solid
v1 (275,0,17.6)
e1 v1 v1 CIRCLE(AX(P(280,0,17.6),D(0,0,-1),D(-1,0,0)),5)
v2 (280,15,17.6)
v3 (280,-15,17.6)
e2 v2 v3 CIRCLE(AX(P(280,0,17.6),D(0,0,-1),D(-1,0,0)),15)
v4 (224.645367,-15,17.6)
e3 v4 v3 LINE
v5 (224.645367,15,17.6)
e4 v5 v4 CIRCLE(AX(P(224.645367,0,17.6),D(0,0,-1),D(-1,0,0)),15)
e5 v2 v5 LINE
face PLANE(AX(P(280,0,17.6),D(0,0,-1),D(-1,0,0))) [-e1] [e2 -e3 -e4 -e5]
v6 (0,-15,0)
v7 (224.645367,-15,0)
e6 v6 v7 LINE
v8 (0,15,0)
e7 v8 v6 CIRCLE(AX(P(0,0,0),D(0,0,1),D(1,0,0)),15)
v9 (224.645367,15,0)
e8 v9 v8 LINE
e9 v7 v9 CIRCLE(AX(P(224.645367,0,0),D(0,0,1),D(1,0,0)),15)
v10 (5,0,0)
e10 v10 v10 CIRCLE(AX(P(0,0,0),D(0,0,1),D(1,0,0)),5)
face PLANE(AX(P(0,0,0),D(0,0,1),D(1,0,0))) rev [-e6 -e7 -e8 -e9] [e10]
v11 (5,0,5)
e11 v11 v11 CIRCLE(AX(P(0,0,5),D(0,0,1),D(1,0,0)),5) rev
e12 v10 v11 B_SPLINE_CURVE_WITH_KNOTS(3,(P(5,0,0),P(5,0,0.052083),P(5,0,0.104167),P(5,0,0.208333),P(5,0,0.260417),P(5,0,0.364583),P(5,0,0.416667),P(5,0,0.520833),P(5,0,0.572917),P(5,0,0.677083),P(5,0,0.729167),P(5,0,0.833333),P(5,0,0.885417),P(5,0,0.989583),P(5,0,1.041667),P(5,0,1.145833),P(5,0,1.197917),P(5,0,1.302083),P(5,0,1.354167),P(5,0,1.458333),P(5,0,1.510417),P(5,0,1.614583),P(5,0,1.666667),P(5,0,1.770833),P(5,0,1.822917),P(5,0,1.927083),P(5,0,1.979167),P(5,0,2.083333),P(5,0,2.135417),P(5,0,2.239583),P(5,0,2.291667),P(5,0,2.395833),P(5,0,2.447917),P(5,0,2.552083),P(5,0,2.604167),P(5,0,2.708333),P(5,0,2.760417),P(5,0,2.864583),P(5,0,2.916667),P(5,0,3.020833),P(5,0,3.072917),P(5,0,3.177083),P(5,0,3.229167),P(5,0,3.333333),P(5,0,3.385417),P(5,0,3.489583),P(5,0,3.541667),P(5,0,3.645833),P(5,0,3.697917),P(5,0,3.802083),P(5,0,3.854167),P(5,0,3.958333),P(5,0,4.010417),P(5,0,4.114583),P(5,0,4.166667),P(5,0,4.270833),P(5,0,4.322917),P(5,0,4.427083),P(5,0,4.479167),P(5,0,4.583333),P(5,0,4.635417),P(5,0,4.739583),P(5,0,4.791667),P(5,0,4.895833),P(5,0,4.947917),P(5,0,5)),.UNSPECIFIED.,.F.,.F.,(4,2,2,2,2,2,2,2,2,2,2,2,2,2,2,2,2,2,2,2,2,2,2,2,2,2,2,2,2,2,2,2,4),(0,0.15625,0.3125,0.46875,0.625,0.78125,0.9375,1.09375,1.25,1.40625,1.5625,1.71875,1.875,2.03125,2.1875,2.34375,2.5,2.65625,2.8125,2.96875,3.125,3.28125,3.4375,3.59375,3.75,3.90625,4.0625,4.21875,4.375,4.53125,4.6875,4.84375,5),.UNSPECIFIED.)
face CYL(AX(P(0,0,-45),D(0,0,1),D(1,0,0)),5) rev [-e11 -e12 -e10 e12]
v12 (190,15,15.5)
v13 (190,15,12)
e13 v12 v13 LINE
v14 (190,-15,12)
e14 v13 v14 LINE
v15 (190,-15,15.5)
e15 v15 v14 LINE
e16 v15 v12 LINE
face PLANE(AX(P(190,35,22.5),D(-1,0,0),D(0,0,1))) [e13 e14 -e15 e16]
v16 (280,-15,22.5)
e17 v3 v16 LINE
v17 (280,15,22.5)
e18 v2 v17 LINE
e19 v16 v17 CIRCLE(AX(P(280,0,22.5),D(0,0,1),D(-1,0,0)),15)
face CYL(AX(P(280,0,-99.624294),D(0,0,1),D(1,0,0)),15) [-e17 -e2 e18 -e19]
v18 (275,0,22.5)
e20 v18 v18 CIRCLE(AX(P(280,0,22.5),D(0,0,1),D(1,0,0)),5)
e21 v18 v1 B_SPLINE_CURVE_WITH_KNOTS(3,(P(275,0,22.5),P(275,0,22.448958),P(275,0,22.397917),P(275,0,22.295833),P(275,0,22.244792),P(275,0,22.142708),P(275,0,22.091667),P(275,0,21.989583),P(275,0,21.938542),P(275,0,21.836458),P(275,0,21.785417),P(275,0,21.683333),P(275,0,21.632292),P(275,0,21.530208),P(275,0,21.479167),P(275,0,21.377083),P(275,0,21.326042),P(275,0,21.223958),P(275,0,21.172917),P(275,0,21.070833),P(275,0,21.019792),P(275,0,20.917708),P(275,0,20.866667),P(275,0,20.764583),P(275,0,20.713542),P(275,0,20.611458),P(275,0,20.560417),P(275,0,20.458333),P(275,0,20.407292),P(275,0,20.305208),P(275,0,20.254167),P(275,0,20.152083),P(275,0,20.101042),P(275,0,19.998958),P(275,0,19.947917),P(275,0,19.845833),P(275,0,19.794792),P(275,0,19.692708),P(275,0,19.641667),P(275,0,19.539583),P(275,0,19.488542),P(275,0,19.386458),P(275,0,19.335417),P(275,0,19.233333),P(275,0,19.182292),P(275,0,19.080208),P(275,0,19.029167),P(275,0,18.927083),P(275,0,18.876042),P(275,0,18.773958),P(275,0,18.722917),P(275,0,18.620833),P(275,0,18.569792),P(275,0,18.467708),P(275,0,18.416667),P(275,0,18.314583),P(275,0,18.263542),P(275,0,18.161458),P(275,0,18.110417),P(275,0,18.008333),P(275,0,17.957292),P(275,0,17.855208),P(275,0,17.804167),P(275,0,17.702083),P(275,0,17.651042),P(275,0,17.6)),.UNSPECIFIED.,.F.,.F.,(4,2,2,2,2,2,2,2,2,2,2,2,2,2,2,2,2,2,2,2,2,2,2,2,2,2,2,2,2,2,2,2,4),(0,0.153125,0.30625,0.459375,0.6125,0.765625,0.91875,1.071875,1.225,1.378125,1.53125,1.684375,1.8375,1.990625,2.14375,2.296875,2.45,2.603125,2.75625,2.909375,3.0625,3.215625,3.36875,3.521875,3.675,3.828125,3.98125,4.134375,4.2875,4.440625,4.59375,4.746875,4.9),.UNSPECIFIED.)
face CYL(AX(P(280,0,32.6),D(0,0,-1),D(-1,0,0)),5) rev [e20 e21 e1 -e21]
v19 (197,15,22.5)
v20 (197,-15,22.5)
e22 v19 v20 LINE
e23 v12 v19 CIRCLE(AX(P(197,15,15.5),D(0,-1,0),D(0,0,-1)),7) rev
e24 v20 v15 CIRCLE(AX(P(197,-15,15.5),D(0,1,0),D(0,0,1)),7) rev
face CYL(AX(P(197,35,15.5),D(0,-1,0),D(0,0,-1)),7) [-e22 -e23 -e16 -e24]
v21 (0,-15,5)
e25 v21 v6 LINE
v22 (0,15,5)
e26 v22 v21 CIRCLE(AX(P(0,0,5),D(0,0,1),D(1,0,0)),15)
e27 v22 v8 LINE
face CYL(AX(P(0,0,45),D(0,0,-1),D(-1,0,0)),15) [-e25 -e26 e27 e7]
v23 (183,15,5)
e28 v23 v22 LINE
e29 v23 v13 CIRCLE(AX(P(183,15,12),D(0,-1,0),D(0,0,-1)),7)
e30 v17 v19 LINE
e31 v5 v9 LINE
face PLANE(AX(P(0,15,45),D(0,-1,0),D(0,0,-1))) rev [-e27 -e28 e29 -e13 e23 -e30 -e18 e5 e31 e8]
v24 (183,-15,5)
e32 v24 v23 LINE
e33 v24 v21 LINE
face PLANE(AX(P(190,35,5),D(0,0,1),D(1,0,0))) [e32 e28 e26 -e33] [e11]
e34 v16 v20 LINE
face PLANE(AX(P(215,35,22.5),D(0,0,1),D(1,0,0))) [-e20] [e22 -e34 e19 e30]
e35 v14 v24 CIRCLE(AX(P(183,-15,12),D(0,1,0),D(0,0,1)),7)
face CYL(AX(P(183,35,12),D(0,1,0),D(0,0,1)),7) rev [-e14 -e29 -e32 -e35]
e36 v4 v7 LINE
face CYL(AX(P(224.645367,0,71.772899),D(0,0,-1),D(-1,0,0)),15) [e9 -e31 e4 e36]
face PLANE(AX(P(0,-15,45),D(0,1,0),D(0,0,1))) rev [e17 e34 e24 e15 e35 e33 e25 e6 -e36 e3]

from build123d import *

# Parameters (mm, degrees)
BOSS_EXTRUDE1_DEPTH = 45
SKETCH2_R           = 5
CUT_EXTRUDE1_DEPTH  = 90
SKETCH7_OUTSIDE_W   = 279.254
SKETCH7_OUTSIDE_H   = 94.254
CUT_EXTRUDE2_DEPTH  = 50
FILLET1_R           = 7
BOSS_EXTRUDE2_DEPTH = 22.5
CUT_EXTRUDE3_START  = -17.6
SKETCH10_R          = 15
CUT_EXTRUDE3_DEPTH  = 17.6
FILLET3_START       = -1
FILLET3_DEPTH       = 18.6
CUT_EXTRUDE4_DEPTH  = 17.6
SKETCH12_R          = 5
CUT_EXTRUDE5_DEPTH  = 15


with BuildPart() as part:
    # Sketch1 → Boss-Extrude1 (new body)
    with BuildSketch(Plane.XY):
        with BuildLine():
            Line((0, 15), (200, 15))
            ThreePointArc((200, 15), (215, 0), (200, -15))
            Line((200, -15), (0, -15))
            ThreePointArc((0, -15), (-15, 0), (0, 15))
        make_face()
    extrude(amount=BOSS_EXTRUDE1_DEPTH)

    # Sketch2 → Cut-Extrude1 (cut)
    with BuildSketch(Plane.XY.offset(45)):
        Circle(SKETCH2_R)
    extrude(amount=-CUT_EXTRUDE1_DEPTH, mode=Mode.SUBTRACT)

    # Sketch7 outside → Cut-Extrude2 (cut)
    with BuildSketch(Plane.XZ.offset(15)):
        with Locations((100, 22.5)):
            Rectangle(SKETCH7_OUTSIDE_W, SKETCH7_OUTSIDE_H)
        Polygon((215, 22.5), (190, 22.5), (190, 5), (-15, 5), (-15, 0), (215, 0), align=None, mode=Mode.SUBTRACT)
    extrude(amount=-CUT_EXTRUDE2_DEPTH, mode=Mode.SUBTRACT)

    # Fillet1
    fillet1_edges = [part.edges().sort_by_distance(p)[0] for p in [
        (190, 0, 22.5),
        (190, 0, 5),
    ]]
    fillet(fillet1_edges, radius=FILLET1_R)

    # Sketch8 → Boss-Extrude2 (add)
    with BuildSketch(Plane.XY.offset(22.5)):
        with BuildLine():
            Line((200, 15), (280, 15))
            ThreePointArc((280, 15), (295, 0), (280, -15))
            Line((280, -15), (200, -15))
            Line((200, -15), (200, 15))
        make_face()
    extrude(amount=-BOSS_EXTRUDE2_DEPTH)

    # Sketch10 → Cut-Extrude3 (cut)
    with BuildSketch(Plane(origin=(0, 0, 0), x_dir=(-1, 0, 0), z_dir=(0, 0, -1)).offset(CUT_EXTRUDE3_START)):
        with Locations((-280, 0)):
            Circle(SKETCH10_R)
    extrude(amount=CUT_EXTRUDE3_DEPTH, mode=Mode.SUBTRACT)

    # Fillet3: read off the stored shape, not the designer's step
    # Fillet3 outline → Fillet3 (cut)
    with BuildSketch(Plane.XY.offset(FILLET3_START)):
        with BuildLine():
            ThreePointArc((280, -15), (271.538858878, -12.385842358), (266.026885319, -5.454545455))
            ThreePointArc((266.026885319, -5.454545455), (265.286158235, -11.948532524), (259.506098468, -15))
            Line((259.506098468, -15), (280, -15))
        make_face()
        with BuildLine():
            ThreePointArc((259.506098468, 15), (265.286158235, 11.948532524), (266.026885319, 5.454545455))
            ThreePointArc((266.026885319, 5.454545455), (271.538858878, 12.385842358), (280, 15))
            Line((280, 15), (259.506098468, 15))
        make_face()
    extrude(amount=FILLET3_DEPTH, mode=Mode.SUBTRACT)

    # Sketch11 → Cut-Extrude4 (cut)
    with BuildSketch(Plane(origin=(0, 0, 0), x_dir=(-1, 0, 0), z_dir=(0, 0, -1))):
        with BuildLine():
            Line((-224.645366828, -15), (-269.753049234, -15))
            Line((-269.753049234, -15), (-269.753049234, 15))
            Line((-269.753049234, 15), (-224.645366828, 15))
            ThreePointArc((-224.645366828, 15), (-239.645366828, 0), (-224.645366828, -15))
        make_face()
    extrude(amount=-CUT_EXTRUDE4_DEPTH, mode=Mode.SUBTRACT)

    # Sketch12 → Cut-Extrude5 (cut)
    with BuildSketch(Plane(origin=(0, 0, 17.6), x_dir=(-1, 0, 0), z_dir=(0, 0, -1))):
        with Locations((-280, 0)):
            Circle(SKETCH12_R)
    extrude(amount=-CUT_EXTRUDE5_DEPTH, mode=Mode.SUBTRACT)


solid = part.part
